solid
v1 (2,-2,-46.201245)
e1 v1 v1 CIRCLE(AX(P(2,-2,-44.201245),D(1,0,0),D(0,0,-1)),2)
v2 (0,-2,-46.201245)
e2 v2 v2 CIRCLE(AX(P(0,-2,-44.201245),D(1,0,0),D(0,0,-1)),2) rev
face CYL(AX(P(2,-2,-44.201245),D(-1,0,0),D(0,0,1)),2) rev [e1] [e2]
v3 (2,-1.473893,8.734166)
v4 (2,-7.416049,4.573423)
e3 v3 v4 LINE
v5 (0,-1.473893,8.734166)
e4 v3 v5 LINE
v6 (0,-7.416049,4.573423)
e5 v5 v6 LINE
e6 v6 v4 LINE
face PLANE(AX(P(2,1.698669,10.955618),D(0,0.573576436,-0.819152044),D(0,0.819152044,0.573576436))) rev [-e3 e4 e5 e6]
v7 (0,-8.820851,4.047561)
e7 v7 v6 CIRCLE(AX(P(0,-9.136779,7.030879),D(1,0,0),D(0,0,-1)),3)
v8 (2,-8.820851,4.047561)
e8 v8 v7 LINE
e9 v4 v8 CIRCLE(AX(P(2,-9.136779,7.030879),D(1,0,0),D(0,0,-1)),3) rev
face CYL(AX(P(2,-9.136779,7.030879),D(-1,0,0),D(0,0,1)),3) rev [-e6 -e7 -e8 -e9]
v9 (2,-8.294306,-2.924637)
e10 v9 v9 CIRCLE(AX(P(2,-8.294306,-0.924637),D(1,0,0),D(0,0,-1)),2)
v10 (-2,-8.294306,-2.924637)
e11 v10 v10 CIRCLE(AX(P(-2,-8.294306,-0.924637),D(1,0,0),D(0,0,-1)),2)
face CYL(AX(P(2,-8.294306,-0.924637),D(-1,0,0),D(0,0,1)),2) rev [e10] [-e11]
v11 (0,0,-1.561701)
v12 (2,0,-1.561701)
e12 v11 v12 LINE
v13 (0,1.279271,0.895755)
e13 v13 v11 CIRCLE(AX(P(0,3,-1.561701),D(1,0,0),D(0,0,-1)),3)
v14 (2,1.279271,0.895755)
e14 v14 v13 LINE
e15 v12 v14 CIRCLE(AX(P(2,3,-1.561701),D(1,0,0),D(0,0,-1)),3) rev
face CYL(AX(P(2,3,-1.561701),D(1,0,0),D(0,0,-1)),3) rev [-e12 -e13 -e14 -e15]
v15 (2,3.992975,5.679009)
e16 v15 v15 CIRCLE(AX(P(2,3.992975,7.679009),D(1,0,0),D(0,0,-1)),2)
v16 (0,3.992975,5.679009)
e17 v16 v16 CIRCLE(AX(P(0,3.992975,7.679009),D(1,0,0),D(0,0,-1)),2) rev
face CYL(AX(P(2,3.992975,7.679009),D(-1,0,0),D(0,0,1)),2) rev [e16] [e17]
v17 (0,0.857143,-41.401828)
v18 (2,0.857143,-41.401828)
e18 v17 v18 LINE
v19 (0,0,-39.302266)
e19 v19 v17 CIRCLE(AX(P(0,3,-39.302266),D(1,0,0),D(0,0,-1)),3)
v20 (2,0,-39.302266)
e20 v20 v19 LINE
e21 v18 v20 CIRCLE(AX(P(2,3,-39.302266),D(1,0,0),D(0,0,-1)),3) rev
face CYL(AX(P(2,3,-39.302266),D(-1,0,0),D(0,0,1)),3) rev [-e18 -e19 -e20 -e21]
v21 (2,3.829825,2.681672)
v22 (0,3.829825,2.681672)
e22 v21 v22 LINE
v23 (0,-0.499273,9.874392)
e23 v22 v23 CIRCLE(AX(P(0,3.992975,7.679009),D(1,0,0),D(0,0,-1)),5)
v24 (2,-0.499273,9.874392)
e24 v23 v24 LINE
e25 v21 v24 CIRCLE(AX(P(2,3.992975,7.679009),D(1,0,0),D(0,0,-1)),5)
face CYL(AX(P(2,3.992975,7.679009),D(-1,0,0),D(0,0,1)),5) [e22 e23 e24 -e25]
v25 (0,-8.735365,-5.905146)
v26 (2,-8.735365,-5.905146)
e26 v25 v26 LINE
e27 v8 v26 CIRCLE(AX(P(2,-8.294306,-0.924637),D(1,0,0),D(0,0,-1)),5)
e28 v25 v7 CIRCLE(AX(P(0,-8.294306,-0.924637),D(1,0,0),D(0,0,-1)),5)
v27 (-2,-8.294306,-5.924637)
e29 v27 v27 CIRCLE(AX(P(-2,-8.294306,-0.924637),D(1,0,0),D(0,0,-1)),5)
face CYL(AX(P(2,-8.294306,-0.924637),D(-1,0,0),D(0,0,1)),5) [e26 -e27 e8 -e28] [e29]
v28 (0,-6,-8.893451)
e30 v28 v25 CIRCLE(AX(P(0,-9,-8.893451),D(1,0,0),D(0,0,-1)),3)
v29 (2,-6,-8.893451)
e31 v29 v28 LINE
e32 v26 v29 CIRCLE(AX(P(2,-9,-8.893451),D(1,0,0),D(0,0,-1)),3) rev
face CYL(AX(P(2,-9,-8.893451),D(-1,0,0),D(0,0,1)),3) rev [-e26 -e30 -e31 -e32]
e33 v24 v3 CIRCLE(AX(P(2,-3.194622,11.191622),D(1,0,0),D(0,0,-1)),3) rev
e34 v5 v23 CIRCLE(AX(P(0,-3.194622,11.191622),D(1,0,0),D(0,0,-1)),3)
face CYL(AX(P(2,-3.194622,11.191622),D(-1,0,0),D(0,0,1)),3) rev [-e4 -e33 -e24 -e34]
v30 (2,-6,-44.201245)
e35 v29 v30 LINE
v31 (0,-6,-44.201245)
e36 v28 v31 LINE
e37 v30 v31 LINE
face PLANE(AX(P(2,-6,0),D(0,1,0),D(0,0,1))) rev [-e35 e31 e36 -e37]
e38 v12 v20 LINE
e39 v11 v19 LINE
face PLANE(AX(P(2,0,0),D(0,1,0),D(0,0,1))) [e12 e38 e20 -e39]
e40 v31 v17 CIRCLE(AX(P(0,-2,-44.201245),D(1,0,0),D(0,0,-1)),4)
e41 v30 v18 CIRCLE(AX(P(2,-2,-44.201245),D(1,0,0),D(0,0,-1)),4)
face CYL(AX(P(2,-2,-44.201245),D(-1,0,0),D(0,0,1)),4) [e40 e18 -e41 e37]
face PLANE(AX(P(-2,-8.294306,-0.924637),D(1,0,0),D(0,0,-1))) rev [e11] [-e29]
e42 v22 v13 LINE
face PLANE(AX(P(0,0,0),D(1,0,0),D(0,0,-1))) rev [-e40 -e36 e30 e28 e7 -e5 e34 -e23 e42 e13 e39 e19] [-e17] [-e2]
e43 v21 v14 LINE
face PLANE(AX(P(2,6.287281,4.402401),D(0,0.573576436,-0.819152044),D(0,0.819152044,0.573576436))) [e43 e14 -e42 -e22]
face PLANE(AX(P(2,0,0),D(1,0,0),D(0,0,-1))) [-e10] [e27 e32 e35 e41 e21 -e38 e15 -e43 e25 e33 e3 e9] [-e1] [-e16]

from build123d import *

# Parameters (mm, degrees)
EXTRUDE_1_DEPTH          = 2
EXTRUDE_START            = -2
SKETCH_1_4_R             = 5
EXTRUDE_2_DEPTH          = 2
CUT_EXTRUDE_1_DEPTH      = 51.040969284
CUT_EXTRUDE_1_DEPTH_BACK = 51.040969284
SKETCH_1_3_R             = 2
FILLET_1_R               = 3


with BuildPart() as part:
    # 草图1 → 凸台-拉伸1 (new body)
    with BuildSketch(Plane(origin=(0, 0, 0), x_dir=(0, 0, -1), z_dir=(1, 0, 0))):
        with BuildLine():
            Line((40.737143614, 0), (0, 0))
            Line((0, 0), (2.48051592, -3.542543867))
            ThreePointArc((2.48051592, -3.542543867), (4.165783411, -4.487079684), (5.367176995, -6))
            Line((5.367176995, -6), (44.201245229, -6))
            ThreePointArc((44.201245229, -6), (40.737143614, -4), (40.737143614, 0))
        make_face()
        with BuildLine():
            Line((2.48051592, -3.542543867), (0, 0))
            Line((0, 0), (-2.681672007, 3.829824531))
            ThreePointArc((-2.681672007, 3.829824531), (-4.811127311, -0.102785303), (-9.234888361, -0.758786959))
            Line((-9.234888361, -0.758786959), (-4.072700434, -8.131155358))
            ThreePointArc((-4.072700434, -8.131155358), (-1.94324513, -4.198545524), (2.48051592, -3.542543867))
        make_face()
        with BuildLine():
            ThreePointArc((48.201245229, -2), (45.23652141, 1.863703305), (40.737143614, 0))
            Line((40.737143614, 0), (44.201245229, 0))
            ThreePointArc((44.201245229, 0), (45.615458792, -0.585786438), (46.201245229, -2))
            ThreePointArc((46.201245229, -2), (45.615458792, -3.414213562), (44.201245229, -4))
            Line((44.201245229, -4), (44.201245229, -6))
            ThreePointArc((44.201245229, -6), (47.029672354, -4.828427125), (48.201245229, -2))
        make_face()
        with BuildLine():
            Line((44.201245229, 0), (40.737143614, 0))
            ThreePointArc((40.737143614, 0), (40.737143614, -4), (44.201245229, -6))
            Line((44.201245229, -6), (44.201245229, -4))
            ThreePointArc((44.201245229, -4), (42.201245229, -2), (44.201245229, 0))
        make_face()
        with BuildLine():
            ThreePointArc((5.367176995, -6), (4.165783411, -4.487079684), (2.48051592, -3.542543867))
            Line((2.48051592, -3.542543867), (4.201245229, -6))
            Line((4.201245229, -6), (5.367176995, -6))
        make_face()
        with BuildLine():
            Line((4.201245229, -6), (2.48051592, -3.542543867))
            ThreePointArc((2.48051592, -3.542543867), (-1.94324513, -4.198545524), (-4.072700434, -8.131155358))
            Line((-4.072700434, -8.131155358), (-2.351971125, -10.588611491))
            Line((-2.351971125, -10.588611491), (-0.713667036, -9.441458618))
            ThreePointArc((-0.713667036, -9.441458618), (-0.222515821, -6.656001657), (2.562941141, -7.147152873))
            Line((2.562941141, -7.147152873), (4.201245229, -6))
        make_face()
        with BuildLine():
            ThreePointArc((-9.234888361, -0.758786959), (-4.811127311, -0.102785303), (-2.681672007, 3.829824531))
            Line((-2.681672007, 3.829824531), (-4.402401316, 6.287280664))
            Line((-4.402401316, 6.287280664), (-6.040705405, 5.140127792))
            ThreePointArc((-6.040705405, 5.140127792), (-5.771575592, 4.594386518), (-5.679009493, 3.992974919))
            ThreePointArc((-5.679009493, 3.992974919), (-7.077597894, 2.085541017), (-9.317313582, 2.845822046))
            Line((-9.317313582, 2.845822046), (-10.95561767, 1.698669174))
            Line((-10.95561767, 1.698669174), (-9.234888361, -0.758786959))
        make_face()
        with BuildLine():
            Line((-4.402401316, 6.287280664), (-2.681672007, 3.829824531))
            ThreePointArc((-2.681672007, 3.829824531), (-2.679675166, 3.911388863), (-2.679009493, 3.992974919))
            ThreePointArc((-2.679009493, 3.992974919), (-10.613341245, 8.041394014), (-9.234888361, -0.758786959))
            Line((-9.234888361, -0.758786959), (-10.95561767, 1.698669174))
            Line((-10.95561767, 1.698669174), (-9.317313582, 2.845822046))
            ThreePointArc((-9.317313582, 2.845822046), (-8.826162366, 5.631279008), (-6.040705405, 5.140127792))
            Line((-6.040705405, 5.140127792), (-4.402401316, 6.287280664))
        make_face()
        with BuildLine():
            ThreePointArc((46.201245229, -2), (45.615458792, -0.585786438), (44.201245229, 0))
            Line((44.201245229, 0), (44.201245229, -4))
            ThreePointArc((44.201245229, -4), (45.615458792, -3.414213562), (46.201245229, -2))
        make_face()
        with BuildLine():
            Line((44.201245229, -4), (44.201245229, 0))
            ThreePointArc((44.201245229, 0), (42.201245229, -2), (44.201245229, -4))
        make_face()
        with BuildLine():
            Line((5.367176995, -6), (4.201245229, -6))
            Line((4.201245229, -6), (2.562941141, -7.147152873))
            ThreePointArc((2.562941141, -7.147152873), (2.832070954, -7.692894146), (2.924637052, -8.294305745))
            ThreePointArc((2.924637052, -8.294305745), (1.526048651, -10.201739647), (-0.713667036, -9.441458618))
            Line((-0.713667036, -9.441458618), (-2.351971125, -10.588611491))
            Line((-2.351971125, -10.588611491), (-4.072700434, -8.131155358))
            ThreePointArc((-4.072700434, -8.131155358), (0.843050996, -13.293640073), (5.924637052, -8.294305745))
            ThreePointArc((5.924637052, -8.294305745), (5.783273678, -7.113776143), (5.367176995, -6))
        make_face()
        with BuildLine():
            ThreePointArc((2.924637052, -8.294305745), (2.832070954, -7.692894146), (2.562941141, -7.147152873))
            Line((2.562941141, -7.147152873), (-0.713667036, -9.441458618))
            ThreePointArc((-0.713667036, -9.441458618), (1.526048651, -10.201739647), (2.924637052, -8.294305745))
        make_face()
        with BuildLine():
            Line((-0.713667036, -9.441458618), (2.562941141, -7.147152873))
            ThreePointArc((2.562941141, -7.147152873), (-0.222515821, -6.656001657), (-0.713667036, -9.441458618))
        make_face()
        with BuildLine():
            ThreePointArc((-5.679009493, 3.992974919), (-5.771575592, 4.594386518), (-6.040705405, 5.140127792))
            Line((-6.040705405, 5.140127792), (-9.317313582, 2.845822046))
            ThreePointArc((-9.317313582, 2.845822046), (-7.077597894, 2.085541017), (-5.679009493, 3.992974919))
        make_face()
        with BuildLine():
            Line((-9.317313582, 2.845822046), (-6.040705405, 5.140127792))
            ThreePointArc((-6.040705405, 5.140127792), (-8.826162366, 5.631279008), (-9.317313582, 2.845822046))
        make_face()
    extrude(amount=EXTRUDE_1_DEPTH)

    # 草图1<4> → 凸台-拉伸2 (add)
    with BuildSketch(Plane(origin=(0, 0, 0), x_dir=(0, 0, -1), z_dir=(1, 0, 0)).offset(EXTRUDE_START)):
        with Locations(Location((0.924637052, -8.294305745, 0), (0, 0, 178.130102354))):
            Circle(SKETCH_1_4_R)
    extrude(amount=EXTRUDE_2_DEPTH)

    # 草图1<3> → 切除-拉伸1 (cut, two sides: drawn at the far end of the back side and taken through both)
    with BuildSketch(Plane(origin=(0, 0, 0), x_dir=(0, 0, -1), z_dir=(1, 0, 0)).offset(-CUT_EXTRUDE_1_DEPTH_BACK)):
        with Locations((-7.679009493, 3.992974919)):
            Circle(SKETCH_1_3_R)
        with Locations((44.201245229, -2)):
            Circle(SKETCH_1_3_R)
        with Locations((0.924637052, -8.294305745)):
            Circle(SKETCH_1_3_R)
    extrude(amount=CUT_EXTRUDE_1_DEPTH + CUT_EXTRUDE_1_DEPTH_BACK, mode=Mode.SUBTRACT)

    # 圆角1
    # the kernel refuses this fillet: 3 mm, written as the material it adds along each edge
    with BuildSketch(Plane(origin=(0, -6, -5.367176995), x_dir=(0, 0, -1), z_dir=(1, 0, 0))) as fillet_1_piece_1:
        with BuildLine():
            CenterArc((3.526273997, -3), FILLET_1_R, 90, 84.939259464)
            ThreePointArc((0.53796877, -2.735364655), (0.463478447, -1.329430853), (0, 0))
            Line((0, 0), (3.526273997, 0))
        make_face()
    extrude(amount=2)
    with BuildSketch(Plane(origin=(0, 0, 0), x_dir=(0, 0, -1), z_dir=(1, 0, 0))) as fillet_1_piece_2:
        with BuildLine():
            CenterArc((FILLET_1_R * 0.520567050552, FILLET_1_R), FILLET_1_R, 215, 55)
            Line((-FILLET_1_R * 0.298584993737, FILLET_1_R * 0.426423563649), (0, 0))
            Line((0, 0), (FILLET_1_R * 0.520567050552, 0))
        make_face()
    extrude(amount=2)
    with BuildSketch(Plane(origin=(0, 0, -40.737143614), x_dir=(0, 0.790236885240252, -0.6128014892326752), z_dir=(1, 0, 0))) as fillet_1_piece_3:
        with BuildLine():
            CenterArc((1.49141536, 2.972297887), FILLET_1_R, 217.792345701, 44.415308597)
            Line((-0.879295296, 1.133893419), (0, 0))
            ThreePointArc((0, 0), (0.542332858, 0.036936151), (1.084665716, 0))
        make_face()
    extrude(amount=2)
    with BuildSketch(Plane(origin=(0, -0.758786959, 9.234888361), x_dir=(0, -0.8191520442889745, -0.5735764363510707), z_dir=(1, 0, 0))) as fillet_1_piece_4:
        with BuildLine():
            CenterArc((0.872983346, -3), FILLET_1_R, 90, 28.955024372)
            ThreePointArc((-0.579385409, -0.375), (-0.283214788, -0.19750856), (0, 0))
            Line((0, 0), (0.872983346, 0))
        make_face()
    extrude(amount=2)
    with BuildSketch(Plane(origin=(0, -8.131155358, 4.072700434), x_dir=(0, -0.9993363396246481, -0.03642636827368134), z_dir=(1, 0, 0))) as fillet_1_piece_5:
        with BuildLine():
            CenterArc((0.897200113, -2.992846785), FILLET_1_R, 93.957436637, 28.955024372)
            Line((-0.732871014, -0.474341649), (0, 0))
            ThreePointArc((0, 0), (0.345076967, -0.011922025), (0.690153933, 0))
        make_face()
    extrude(amount=2)


solid = part.part
